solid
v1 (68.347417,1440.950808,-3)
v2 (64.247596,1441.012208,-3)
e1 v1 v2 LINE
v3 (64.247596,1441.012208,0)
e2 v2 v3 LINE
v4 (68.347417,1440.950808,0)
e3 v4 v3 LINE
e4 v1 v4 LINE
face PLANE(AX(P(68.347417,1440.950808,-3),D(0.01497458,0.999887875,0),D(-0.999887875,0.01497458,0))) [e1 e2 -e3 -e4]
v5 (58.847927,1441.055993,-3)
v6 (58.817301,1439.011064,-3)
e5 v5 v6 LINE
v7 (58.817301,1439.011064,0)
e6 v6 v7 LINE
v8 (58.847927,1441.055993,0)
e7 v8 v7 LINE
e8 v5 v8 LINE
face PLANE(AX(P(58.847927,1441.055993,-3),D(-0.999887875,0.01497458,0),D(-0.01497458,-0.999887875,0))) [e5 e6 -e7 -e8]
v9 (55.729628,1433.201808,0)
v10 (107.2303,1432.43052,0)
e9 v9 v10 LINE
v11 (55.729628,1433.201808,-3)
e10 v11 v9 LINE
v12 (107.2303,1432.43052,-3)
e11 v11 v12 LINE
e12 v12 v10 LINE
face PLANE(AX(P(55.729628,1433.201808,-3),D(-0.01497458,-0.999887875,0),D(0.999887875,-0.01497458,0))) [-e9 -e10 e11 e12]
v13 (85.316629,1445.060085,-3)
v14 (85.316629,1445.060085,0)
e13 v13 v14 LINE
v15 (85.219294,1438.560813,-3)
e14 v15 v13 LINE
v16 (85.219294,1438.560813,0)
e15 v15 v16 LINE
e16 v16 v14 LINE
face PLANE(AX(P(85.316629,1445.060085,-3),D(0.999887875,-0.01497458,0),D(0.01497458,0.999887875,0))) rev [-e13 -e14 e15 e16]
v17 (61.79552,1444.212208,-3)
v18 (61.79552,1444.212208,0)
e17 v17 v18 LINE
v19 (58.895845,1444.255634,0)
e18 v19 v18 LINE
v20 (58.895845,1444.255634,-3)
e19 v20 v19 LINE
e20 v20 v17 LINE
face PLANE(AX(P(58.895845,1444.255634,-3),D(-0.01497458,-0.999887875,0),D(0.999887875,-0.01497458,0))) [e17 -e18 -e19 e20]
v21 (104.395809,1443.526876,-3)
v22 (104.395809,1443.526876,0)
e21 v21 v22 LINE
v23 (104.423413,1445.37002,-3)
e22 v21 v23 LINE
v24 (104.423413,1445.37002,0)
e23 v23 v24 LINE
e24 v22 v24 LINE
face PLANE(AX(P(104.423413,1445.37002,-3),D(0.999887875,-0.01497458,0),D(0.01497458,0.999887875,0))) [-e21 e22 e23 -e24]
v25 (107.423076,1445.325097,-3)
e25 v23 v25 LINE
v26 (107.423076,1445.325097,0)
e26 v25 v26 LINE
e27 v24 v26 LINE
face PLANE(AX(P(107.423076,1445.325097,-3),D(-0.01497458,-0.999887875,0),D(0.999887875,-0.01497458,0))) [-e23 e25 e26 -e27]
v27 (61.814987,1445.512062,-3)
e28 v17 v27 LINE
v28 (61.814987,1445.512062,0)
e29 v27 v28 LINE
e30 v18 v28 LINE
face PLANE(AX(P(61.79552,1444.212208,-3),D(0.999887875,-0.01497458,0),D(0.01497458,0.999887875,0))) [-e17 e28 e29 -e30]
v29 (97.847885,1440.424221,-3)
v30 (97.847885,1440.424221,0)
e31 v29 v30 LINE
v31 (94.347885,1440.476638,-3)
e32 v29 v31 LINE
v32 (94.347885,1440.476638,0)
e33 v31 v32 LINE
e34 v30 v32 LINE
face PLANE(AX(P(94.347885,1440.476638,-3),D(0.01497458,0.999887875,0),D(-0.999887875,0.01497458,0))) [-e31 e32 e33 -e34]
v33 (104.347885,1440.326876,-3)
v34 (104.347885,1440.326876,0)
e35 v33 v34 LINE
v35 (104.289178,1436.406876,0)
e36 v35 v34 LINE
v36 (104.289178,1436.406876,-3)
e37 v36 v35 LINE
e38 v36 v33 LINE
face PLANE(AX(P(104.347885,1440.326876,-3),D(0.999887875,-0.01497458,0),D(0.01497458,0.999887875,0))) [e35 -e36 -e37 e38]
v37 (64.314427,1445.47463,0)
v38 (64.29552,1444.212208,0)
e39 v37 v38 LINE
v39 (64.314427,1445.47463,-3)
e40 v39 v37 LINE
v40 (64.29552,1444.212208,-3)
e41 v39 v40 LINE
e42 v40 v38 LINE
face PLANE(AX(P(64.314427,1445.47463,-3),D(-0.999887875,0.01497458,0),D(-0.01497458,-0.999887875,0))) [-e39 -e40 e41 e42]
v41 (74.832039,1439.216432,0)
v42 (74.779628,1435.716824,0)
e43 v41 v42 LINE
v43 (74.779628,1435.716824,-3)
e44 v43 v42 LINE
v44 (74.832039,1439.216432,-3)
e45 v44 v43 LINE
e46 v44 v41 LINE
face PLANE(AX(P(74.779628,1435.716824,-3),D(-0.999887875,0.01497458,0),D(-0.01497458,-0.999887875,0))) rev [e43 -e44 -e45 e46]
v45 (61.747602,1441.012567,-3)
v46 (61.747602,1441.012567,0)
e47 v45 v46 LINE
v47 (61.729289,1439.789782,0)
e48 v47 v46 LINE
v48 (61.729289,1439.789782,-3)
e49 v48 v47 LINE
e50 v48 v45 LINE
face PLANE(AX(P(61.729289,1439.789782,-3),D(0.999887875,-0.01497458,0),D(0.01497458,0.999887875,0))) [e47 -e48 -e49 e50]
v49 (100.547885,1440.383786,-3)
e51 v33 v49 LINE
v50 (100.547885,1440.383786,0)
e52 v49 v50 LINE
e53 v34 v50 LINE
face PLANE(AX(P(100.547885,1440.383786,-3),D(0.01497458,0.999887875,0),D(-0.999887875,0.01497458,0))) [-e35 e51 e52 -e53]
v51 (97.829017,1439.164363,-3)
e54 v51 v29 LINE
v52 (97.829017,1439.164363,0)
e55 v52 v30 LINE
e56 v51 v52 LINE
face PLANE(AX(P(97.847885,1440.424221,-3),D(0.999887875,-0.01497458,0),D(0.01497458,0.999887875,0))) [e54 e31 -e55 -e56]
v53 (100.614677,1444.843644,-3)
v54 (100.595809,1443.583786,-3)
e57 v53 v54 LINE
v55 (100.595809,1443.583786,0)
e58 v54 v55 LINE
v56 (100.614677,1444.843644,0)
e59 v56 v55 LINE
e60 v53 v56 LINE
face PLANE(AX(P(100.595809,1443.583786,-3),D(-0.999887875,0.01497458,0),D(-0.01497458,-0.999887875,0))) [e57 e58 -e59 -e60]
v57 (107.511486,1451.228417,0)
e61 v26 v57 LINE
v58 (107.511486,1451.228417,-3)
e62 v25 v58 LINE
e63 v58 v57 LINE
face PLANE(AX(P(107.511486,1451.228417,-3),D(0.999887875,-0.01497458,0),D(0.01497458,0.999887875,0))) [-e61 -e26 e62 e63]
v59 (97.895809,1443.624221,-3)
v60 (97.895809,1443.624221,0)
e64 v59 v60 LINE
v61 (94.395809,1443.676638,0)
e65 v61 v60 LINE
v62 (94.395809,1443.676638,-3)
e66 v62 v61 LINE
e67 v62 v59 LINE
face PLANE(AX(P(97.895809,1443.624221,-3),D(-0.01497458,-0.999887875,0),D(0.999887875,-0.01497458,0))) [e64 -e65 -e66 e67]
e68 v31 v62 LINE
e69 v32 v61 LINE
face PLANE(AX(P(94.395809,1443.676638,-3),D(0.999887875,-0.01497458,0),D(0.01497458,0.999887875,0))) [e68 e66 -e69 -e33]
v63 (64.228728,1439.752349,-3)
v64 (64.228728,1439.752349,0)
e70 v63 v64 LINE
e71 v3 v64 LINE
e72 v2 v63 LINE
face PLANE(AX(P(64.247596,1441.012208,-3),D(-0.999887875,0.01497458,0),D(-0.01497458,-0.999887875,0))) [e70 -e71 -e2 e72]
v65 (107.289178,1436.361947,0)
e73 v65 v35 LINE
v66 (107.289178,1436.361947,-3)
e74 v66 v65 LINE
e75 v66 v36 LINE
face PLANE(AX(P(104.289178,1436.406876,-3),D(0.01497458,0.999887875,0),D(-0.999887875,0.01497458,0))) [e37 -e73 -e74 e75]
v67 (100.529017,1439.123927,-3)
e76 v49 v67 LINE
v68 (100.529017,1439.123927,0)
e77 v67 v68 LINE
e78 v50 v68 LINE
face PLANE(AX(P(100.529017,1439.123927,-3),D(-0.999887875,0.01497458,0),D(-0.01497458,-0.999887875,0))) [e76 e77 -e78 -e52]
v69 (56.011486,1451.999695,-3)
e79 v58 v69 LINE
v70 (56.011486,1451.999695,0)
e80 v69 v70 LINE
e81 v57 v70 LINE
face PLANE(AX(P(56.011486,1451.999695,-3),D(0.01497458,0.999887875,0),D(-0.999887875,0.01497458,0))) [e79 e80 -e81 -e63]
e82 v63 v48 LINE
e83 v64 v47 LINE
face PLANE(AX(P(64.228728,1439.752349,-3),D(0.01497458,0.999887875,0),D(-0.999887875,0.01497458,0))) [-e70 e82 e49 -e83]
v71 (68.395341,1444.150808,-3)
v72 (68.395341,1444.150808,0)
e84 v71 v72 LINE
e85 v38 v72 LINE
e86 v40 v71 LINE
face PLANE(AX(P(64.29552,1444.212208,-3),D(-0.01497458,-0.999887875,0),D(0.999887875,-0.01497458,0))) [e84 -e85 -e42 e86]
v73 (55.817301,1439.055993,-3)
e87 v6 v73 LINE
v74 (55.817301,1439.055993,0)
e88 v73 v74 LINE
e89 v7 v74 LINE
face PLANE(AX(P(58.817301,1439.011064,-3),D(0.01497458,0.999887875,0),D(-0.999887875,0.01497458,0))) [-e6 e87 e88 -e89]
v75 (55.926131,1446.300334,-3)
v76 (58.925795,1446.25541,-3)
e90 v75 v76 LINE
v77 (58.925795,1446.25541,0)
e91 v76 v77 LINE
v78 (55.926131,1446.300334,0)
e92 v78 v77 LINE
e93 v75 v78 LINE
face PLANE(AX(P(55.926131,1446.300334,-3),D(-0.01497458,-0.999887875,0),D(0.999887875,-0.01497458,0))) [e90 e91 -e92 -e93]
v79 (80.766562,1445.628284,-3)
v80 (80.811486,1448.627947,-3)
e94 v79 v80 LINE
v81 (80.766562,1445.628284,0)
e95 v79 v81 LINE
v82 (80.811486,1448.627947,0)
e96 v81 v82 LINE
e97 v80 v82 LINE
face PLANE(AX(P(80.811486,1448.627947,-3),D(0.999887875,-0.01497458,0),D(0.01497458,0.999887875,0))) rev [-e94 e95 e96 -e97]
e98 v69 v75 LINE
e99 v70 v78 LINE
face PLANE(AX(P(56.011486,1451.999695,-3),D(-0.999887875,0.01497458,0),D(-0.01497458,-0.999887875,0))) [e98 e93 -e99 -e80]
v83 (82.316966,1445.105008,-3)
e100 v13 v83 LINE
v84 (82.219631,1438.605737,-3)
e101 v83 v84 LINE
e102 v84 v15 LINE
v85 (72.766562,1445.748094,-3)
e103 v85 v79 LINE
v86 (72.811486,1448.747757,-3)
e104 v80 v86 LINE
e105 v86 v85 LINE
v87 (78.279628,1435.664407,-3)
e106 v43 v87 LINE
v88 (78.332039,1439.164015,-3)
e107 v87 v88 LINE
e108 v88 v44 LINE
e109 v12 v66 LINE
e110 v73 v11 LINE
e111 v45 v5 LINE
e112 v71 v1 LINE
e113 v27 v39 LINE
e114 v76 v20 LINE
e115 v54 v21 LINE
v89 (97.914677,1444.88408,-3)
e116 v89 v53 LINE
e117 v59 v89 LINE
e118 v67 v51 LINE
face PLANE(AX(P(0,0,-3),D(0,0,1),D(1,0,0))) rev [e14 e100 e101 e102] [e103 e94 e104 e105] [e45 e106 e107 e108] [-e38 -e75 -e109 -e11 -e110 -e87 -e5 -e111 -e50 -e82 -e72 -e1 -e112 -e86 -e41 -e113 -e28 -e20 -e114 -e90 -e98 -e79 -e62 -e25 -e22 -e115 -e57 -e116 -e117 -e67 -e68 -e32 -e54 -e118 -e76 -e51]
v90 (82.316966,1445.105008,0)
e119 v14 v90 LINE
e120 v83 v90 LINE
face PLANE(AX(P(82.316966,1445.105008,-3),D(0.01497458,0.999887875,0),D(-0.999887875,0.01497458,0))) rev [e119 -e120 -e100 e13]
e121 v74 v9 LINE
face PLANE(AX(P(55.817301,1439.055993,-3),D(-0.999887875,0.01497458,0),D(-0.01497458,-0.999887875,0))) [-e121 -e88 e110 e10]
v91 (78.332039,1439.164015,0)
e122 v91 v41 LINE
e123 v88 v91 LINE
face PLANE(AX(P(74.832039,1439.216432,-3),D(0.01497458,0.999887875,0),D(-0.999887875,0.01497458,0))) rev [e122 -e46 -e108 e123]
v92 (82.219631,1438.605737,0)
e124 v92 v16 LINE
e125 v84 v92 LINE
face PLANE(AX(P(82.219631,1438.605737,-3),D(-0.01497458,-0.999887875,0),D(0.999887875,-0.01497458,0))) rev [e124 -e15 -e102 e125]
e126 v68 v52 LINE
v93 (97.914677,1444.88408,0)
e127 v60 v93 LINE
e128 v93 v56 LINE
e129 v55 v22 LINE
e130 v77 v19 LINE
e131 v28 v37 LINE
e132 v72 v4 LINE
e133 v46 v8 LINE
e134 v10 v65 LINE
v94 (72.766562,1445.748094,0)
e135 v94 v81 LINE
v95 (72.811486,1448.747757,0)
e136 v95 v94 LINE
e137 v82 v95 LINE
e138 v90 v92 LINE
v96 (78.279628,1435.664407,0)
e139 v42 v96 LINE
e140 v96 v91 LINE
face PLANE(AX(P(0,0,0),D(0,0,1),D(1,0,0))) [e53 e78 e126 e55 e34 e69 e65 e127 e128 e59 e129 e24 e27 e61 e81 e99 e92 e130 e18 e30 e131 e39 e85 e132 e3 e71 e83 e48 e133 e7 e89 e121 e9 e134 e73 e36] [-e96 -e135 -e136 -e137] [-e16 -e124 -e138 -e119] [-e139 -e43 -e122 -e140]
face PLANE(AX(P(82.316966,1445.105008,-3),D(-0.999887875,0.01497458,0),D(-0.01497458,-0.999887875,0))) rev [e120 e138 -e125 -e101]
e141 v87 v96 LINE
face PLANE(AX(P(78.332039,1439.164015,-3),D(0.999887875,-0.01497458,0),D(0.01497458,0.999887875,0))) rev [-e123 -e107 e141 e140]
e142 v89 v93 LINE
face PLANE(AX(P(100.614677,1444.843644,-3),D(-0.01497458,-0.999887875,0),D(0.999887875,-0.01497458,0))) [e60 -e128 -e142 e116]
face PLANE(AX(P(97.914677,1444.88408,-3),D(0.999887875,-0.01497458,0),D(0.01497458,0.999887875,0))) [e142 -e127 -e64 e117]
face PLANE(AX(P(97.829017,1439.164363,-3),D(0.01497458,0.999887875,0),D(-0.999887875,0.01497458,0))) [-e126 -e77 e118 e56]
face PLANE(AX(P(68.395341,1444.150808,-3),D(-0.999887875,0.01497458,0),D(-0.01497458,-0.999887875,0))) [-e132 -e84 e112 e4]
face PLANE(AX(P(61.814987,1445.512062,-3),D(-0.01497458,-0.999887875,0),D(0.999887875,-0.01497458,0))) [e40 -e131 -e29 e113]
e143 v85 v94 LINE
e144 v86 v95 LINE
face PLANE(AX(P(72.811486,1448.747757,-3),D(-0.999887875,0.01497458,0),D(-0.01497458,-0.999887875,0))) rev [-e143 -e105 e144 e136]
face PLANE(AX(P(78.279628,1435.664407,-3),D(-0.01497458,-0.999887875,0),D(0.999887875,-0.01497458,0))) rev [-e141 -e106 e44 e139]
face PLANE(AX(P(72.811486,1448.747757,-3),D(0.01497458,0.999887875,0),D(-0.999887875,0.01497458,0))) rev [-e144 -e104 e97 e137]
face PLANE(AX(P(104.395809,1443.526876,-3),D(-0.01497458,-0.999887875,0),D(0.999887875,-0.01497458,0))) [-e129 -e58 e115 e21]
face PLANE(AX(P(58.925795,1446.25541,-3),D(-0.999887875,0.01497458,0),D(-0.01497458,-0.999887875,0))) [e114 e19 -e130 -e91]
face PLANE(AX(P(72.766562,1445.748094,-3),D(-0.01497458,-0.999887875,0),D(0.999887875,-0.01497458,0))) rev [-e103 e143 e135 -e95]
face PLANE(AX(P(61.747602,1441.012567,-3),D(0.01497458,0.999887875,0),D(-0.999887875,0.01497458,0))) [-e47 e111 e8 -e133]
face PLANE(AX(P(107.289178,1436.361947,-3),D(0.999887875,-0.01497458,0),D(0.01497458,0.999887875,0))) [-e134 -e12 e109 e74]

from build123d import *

# Parameters (mm, degrees)
T_LE_DE_BASE_PLI_E1_DEPTH = 3


# Sheet-metal steps are written as plain solids
with BuildPart() as part:
    # Esquisse1 → Tôle de base pliée1 (new body)
    with BuildSketch(Plane.XY):
        Polygon((56.011486003, 1451.999694839), (107.511486003, 1451.228417484), (107.423076338, 1445.325096569), (104.423412714, 1445.370020309), (104.395809304, 1443.526875799), (100.595809304, 1443.583785584), (100.614677274, 1444.843644306), (97.914677274, 1444.884080206), (97.895809304, 1443.624221484), (94.395809304, 1443.676638392), (94.347885274, 1440.476638392), (97.847885274, 1440.424221484), (97.829017303, 1439.164362762), (100.529017303, 1439.123926862), (100.547885274, 1440.383785584), (104.347885274, 1440.326875799), (104.289178337, 1436.406875799), (107.289178337, 1436.361947021), (107.230300273, 1432.430520402), (55.729627521, 1433.201807832), (55.81730132, 1439.055993264), (58.81730132, 1439.011064486), (58.847926704, 1441.055993264), (61.74760154, 1441.012566982), (61.729288791, 1439.789781712), (64.228728196, 1439.752349459), (64.247596167, 1441.012208181), (68.347416735, 1440.950808205), (68.395340765, 1444.150808205), (64.295520197, 1444.212208181), (64.314426556, 1445.474630165), (61.814987151, 1445.512062418), (61.795520197, 1444.212208181), (58.89584536, 1444.255634463), (58.92579452, 1446.255410213), (55.926130896, 1446.300333953), align=None)
        Polygon((72.811486003, 1448.747757268), (80.811486003, 1448.627947194), (80.766562262, 1445.62828357), (72.766562262, 1445.748093644), align=None, mode=Mode.SUBTRACT)
        Polygon((82.316965577, 1445.105008259), (82.219630807, 1438.605737073), (85.219294431, 1438.560813333), (85.316629201, 1445.060084519), align=None, mode=Mode.SUBTRACT)
        Polygon((74.832038551, 1439.21643164), (78.332038551, 1439.164014732), (78.279627521, 1435.664407171), (74.779627521, 1435.716824078), align=None, mode=Mode.SUBTRACT)
    extrude(amount=-T_LE_DE_BASE_PLI_E1_DEPTH)


solid = part.part
